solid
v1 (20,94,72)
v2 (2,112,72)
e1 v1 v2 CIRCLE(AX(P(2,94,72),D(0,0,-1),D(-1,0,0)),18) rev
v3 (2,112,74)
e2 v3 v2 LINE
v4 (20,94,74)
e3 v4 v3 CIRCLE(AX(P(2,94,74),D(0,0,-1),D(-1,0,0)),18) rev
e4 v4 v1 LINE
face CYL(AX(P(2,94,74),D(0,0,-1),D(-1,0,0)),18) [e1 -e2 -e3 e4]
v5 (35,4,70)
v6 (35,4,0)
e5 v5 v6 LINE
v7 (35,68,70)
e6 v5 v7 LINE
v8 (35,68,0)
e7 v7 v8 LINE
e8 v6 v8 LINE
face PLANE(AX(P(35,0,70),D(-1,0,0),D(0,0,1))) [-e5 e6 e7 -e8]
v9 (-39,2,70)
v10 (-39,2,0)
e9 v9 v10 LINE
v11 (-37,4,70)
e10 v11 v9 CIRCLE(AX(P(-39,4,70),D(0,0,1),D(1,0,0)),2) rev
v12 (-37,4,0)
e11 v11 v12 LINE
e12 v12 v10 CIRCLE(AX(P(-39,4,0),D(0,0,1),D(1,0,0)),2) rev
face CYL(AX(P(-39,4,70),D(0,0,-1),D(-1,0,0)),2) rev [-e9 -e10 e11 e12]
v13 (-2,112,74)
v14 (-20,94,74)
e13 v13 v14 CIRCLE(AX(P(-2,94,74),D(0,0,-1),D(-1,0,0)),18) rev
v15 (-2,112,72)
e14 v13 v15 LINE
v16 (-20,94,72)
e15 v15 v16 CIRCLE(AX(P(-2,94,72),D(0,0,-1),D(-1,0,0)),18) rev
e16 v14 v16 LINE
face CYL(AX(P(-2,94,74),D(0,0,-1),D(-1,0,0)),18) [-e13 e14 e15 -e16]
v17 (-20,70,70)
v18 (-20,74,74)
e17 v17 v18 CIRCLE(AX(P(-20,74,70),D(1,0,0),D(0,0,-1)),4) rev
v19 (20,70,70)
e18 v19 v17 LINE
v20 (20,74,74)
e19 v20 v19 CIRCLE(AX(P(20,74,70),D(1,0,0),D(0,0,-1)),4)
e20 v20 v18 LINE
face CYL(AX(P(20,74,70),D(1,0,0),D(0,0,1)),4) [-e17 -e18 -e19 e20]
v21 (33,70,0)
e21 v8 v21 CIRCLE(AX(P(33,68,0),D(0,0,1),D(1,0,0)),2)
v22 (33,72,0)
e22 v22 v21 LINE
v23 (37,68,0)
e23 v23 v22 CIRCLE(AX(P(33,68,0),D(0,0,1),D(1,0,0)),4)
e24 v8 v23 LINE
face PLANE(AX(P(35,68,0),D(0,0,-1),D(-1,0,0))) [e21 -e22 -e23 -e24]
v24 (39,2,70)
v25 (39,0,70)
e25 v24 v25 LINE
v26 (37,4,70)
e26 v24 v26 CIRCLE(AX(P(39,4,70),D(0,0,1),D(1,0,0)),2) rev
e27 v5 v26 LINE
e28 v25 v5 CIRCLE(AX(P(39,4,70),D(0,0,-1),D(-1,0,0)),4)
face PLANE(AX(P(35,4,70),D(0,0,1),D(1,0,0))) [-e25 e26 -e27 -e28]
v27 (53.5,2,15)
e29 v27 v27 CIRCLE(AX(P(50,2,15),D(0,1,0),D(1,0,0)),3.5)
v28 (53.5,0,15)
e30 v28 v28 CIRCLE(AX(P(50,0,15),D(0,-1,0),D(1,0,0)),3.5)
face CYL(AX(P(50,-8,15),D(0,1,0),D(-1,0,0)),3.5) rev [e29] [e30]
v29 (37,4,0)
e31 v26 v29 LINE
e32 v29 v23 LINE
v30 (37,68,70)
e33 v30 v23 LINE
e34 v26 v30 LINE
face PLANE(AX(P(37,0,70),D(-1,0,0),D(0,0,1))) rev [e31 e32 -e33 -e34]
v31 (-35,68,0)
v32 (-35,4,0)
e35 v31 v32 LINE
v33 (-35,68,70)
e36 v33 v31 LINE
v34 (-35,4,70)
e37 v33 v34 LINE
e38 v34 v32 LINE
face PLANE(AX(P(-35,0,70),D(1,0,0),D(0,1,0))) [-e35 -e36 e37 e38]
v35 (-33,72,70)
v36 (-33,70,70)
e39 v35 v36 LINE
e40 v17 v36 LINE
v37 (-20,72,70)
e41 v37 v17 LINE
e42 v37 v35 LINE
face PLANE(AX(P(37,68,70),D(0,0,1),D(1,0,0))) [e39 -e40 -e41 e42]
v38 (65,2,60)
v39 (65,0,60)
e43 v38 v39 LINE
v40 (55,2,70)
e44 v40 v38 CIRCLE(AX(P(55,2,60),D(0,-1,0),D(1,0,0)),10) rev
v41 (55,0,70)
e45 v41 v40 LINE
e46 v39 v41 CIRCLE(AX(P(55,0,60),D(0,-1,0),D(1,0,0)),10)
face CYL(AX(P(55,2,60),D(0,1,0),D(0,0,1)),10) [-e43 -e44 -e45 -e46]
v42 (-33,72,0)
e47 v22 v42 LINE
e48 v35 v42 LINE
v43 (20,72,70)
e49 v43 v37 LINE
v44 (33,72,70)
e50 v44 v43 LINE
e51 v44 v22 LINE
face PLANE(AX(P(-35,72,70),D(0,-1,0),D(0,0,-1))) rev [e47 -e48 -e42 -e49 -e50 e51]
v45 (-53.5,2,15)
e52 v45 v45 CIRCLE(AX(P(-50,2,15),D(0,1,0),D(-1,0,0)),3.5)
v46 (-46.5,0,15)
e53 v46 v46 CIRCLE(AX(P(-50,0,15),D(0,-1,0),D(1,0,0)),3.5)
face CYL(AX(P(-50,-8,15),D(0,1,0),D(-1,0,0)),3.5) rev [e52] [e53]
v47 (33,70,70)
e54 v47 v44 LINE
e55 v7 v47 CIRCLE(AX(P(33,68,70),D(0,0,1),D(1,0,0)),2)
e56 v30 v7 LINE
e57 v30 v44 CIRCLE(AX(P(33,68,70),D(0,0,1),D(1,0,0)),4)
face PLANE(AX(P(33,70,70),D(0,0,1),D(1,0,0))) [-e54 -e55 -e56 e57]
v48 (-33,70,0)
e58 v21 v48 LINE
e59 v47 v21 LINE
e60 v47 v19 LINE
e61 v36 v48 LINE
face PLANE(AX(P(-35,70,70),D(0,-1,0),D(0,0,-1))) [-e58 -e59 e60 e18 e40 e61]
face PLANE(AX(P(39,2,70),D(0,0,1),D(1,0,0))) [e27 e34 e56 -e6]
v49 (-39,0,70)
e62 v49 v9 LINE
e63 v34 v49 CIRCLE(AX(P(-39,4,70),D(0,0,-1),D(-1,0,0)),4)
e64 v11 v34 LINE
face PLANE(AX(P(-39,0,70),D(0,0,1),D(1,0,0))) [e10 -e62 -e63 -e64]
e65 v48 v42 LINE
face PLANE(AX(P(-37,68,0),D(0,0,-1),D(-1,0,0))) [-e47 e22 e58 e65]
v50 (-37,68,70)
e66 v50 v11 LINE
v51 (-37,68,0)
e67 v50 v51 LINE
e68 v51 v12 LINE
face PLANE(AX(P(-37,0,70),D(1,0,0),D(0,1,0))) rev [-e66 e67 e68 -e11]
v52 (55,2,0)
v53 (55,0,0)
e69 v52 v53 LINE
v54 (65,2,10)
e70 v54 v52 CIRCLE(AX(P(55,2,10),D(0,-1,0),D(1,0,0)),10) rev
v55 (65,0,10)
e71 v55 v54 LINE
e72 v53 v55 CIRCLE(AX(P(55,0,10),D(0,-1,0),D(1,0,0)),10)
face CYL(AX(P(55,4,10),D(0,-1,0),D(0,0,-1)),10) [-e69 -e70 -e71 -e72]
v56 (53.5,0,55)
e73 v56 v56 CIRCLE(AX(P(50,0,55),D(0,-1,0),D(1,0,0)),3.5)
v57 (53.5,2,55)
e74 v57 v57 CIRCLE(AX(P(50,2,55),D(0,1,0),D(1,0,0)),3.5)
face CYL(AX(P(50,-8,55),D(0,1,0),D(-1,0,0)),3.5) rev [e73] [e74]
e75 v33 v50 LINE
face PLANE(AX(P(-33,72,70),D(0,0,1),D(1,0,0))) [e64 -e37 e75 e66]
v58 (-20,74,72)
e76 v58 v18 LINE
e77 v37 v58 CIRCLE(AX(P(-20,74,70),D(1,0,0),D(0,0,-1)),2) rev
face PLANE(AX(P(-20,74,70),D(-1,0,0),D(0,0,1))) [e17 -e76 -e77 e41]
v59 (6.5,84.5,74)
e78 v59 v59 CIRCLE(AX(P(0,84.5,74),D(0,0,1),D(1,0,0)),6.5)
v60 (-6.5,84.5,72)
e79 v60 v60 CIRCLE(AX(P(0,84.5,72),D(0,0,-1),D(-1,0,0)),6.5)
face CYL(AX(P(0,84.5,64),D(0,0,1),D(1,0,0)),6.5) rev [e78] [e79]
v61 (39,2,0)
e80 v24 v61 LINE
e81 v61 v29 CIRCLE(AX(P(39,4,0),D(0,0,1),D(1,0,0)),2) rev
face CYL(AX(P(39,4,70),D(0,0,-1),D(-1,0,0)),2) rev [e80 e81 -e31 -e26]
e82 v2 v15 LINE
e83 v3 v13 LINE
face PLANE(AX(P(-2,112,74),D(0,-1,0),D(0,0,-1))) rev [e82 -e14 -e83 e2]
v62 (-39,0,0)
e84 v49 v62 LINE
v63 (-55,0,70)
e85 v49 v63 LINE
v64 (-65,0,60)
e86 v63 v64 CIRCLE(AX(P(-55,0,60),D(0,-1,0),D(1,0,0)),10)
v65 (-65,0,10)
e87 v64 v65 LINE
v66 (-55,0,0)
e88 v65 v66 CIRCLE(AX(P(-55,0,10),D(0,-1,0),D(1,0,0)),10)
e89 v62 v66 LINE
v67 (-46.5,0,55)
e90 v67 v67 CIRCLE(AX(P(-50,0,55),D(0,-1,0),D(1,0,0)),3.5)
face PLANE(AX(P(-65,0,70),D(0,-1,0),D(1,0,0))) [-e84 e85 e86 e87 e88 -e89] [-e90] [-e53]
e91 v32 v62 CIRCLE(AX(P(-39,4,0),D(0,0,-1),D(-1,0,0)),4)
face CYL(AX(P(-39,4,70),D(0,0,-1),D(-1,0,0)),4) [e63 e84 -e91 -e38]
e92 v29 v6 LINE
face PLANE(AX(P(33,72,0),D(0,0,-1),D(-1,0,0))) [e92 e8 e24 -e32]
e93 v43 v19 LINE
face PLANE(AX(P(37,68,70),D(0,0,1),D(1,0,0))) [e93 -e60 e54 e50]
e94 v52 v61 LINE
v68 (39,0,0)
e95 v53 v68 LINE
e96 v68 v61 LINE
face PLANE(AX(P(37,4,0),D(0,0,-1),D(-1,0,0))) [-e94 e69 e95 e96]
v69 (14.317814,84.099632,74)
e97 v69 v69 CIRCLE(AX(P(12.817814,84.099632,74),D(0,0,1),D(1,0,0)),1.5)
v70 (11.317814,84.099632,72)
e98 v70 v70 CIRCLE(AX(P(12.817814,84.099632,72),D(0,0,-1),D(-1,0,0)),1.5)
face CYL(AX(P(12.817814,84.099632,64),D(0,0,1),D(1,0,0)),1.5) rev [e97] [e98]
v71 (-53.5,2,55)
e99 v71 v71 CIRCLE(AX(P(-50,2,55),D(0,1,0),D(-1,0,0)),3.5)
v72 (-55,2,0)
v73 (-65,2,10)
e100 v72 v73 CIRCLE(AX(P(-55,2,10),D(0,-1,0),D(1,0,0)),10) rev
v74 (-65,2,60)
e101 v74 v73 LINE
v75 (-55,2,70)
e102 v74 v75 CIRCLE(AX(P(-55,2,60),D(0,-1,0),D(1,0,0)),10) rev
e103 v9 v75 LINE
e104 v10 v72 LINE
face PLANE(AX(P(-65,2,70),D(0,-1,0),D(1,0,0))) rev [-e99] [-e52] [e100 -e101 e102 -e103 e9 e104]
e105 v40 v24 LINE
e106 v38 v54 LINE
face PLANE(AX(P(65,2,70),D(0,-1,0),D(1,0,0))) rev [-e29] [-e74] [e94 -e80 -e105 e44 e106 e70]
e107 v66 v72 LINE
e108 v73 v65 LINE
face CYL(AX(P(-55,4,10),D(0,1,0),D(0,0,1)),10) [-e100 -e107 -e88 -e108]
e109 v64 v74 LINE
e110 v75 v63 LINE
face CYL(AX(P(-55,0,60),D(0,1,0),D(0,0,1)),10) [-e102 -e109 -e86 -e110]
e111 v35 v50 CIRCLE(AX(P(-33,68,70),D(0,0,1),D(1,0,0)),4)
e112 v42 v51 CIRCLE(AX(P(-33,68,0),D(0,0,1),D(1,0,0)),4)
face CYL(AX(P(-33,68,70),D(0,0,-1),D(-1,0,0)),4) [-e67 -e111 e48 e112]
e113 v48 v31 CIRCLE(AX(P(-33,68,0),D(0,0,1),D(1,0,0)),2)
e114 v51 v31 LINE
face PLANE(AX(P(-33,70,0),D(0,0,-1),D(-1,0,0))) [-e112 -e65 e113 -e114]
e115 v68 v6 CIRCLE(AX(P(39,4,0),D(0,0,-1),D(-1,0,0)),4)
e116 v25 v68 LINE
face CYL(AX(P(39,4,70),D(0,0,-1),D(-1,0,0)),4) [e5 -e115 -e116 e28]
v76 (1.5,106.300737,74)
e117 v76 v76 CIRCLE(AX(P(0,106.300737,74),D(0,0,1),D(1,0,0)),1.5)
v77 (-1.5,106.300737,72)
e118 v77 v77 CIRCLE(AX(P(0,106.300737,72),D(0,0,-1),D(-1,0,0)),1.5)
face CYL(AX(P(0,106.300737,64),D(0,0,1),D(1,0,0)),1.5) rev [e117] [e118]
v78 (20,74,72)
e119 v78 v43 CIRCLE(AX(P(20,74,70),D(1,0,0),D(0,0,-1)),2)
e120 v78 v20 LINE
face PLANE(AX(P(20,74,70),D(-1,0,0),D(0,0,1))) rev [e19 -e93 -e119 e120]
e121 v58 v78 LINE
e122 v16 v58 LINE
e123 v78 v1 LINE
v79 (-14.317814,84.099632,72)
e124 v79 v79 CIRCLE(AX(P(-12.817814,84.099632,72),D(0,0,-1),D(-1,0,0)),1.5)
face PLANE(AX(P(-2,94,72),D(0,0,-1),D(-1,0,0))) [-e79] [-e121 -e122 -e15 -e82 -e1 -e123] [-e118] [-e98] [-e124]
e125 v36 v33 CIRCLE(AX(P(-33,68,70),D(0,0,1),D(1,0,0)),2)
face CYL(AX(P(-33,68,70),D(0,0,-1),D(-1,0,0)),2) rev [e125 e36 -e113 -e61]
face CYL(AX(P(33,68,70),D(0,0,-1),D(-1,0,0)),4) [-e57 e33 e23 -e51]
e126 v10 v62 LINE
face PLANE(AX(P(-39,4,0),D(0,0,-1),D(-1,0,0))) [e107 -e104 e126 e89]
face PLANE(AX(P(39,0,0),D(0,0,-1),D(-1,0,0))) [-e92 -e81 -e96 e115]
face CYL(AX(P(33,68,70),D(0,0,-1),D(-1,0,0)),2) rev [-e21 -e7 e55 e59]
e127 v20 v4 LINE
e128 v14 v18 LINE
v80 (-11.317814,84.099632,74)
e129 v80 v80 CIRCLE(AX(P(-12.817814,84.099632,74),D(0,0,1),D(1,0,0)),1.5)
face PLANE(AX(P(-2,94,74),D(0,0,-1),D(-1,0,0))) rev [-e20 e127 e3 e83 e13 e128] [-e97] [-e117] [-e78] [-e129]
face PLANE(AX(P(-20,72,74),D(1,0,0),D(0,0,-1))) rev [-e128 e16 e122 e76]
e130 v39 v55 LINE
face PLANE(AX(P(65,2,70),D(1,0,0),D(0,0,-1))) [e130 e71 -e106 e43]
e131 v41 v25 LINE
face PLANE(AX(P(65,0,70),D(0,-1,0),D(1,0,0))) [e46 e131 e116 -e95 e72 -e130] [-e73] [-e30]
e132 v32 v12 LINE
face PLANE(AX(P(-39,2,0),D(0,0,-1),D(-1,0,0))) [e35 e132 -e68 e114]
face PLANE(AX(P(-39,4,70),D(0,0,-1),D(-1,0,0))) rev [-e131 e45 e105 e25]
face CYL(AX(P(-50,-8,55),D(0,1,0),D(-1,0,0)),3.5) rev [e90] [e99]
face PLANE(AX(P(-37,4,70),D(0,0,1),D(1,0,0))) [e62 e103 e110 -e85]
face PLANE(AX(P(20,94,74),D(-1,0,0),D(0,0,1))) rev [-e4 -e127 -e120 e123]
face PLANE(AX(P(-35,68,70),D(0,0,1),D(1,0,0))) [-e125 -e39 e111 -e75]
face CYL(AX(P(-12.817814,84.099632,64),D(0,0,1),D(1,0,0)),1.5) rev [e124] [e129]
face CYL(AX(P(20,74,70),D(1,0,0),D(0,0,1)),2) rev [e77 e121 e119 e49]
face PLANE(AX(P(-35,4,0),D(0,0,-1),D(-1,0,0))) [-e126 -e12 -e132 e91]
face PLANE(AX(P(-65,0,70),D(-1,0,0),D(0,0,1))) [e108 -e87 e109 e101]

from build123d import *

# Parameters (mm, degrees)
BASE_FLANGE1_DEPTH      = 70
FILLET1_R               = 10
SKETCH6_R               = 3.5
CUT_EXTRUDE1_DEPTH      = 10
EDGE_FLANGE2_DEPTH      = 40
EDGE_FLANGE2_START      = 2
EDGE_FLANGE2_FLAT_DEPTH = 2
SKETCH14_R              = 1.5
CUT_EXTRUDE2_DEPTH      = 10


# Sheet-metal steps are written as plain solids
with BuildPart() as part:
    # Sketch1 → Base-Flange1 (new body)
    with BuildSketch(Plane.XY):
        with BuildLine():
            Line((-65, 0), (-39, 0))
            ThreePointArc((-39, 0), (-36.171572875, 1.171572875), (-35, 4))
            Line((-35, 4), (-35, 68))
            ThreePointArc((-35, 68), (-34.414213562, 69.414213562), (-33, 70))
            Line((-33, 70), (33, 70))
            ThreePointArc((33, 70), (34.414213562, 69.414213562), (35, 68))
            Line((35, 68), (35, 4))
            ThreePointArc((35, 4), (36.171572875, 1.171572875), (39, 0))
            Line((39, 0), (65, 0))
            Line((65, 0), (65, 2))
            Line((65, 2), (39, 2))
            ThreePointArc((39, 2), (37.585786438, 2.585786438), (37, 4))
            Line((37, 4), (37, 68))
            ThreePointArc((37, 68), (35.828427125, 70.828427125), (33, 72))
            Line((33, 72), (-33, 72))
            ThreePointArc((-33, 72), (-35.828427125, 70.828427125), (-37, 68))
            Line((-37, 68), (-37, 4))
            ThreePointArc((-37, 4), (-37.585786438, 2.585786438), (-39, 2))
            Line((-39, 2), (-65, 2))
            Line((-65, 2), (-65, 0))
        make_face()
    extrude(amount=BASE_FLANGE1_DEPTH)

    # Fillet1
    fillet1_edges = [part.edges().sort_by_distance(p)[0] for p in [
        (65, 1, 0),
        (-65, 1, 0),
        (65, 1, 70),
        (-65, 1, 70),
    ]]
    fillet(fillet1_edges, radius=FILLET1_R)

    # Sketch6 → Cut-Extrude1 (cut)
    with BuildSketch(Plane(origin=(0, 2, 0), x_dir=(1, 0, 0), z_dir=(0, 1, 0))):
        with Locations(Location((-50, -15, 0), (0, 0, 180))):
            Circle(SKETCH6_R)
        with Locations(Location((-50, -55, 0), (0, 0, 180))):
            Circle(SKETCH6_R)
        with Locations((50, -55)):
            Circle(SKETCH6_R)
        with Locations((50, -15)):
            Circle(SKETCH6_R)
    extrude(amount=-CUT_EXTRUDE1_DEPTH, mode=Mode.SUBTRACT)

    # Edge-Flange2 bend section (across the edge) → Edge-Flange2 (add)
    with BuildSketch(Plane(origin=(-20, 72, 72), x_dir=(0, 0, -1), z_dir=(1, 0, 0))):
        with BuildLine():
            Line((-2, 2), (0, 2))
            ThreePointArc((0, 2), (0.585786438, 0.585786438), (2, 0))
            Line((2, 0), (2, -2))
            ThreePointArc((2, -2), (-0.828427125, -0.828427125), (-2, 2))
        make_face()
    extrude(amount=EDGE_FLANGE2_DEPTH)

    # Edge-Flange2 profile (on flange) → Edge-Flange2 flat (add)
    with BuildSketch(Plane(origin=(0, 72, 72), x_dir=(1, 0, 0), z_dir=(0, 0, 1)).offset(EDGE_FLANGE2_START)):
        with BuildLine():
            ThreePointArc((20, 22), (14.727922061, 34.727922061), (2, 40))
            Line((2, 40), (-2, 40))
            ThreePointArc((-2, 40), (-14.727922061, 34.727922061), (-20, 22))
            Line((-20, 22), (-20, 2))
            Line((-20, 2), (20, 2))
            Line((20, 2), (20, 22))
        make_face()
    extrude(amount=-EDGE_FLANGE2_FLAT_DEPTH)

    # Sketch14 → Cut-Extrude2 (cut)
    with BuildSketch(Plane.XY.offset(74)):
        with Locations((0, 106.30073689)):
            Circle(SKETCH14_R)
        with Locations((-12.817814143, 84.099631551)):
            Circle(SKETCH14_R)
        with Locations((12.817814144, 84.099631551)):
            Circle(SKETCH14_R)
        with BuildLine():
            ThreePointArc((0, 90.999999997), (-6.5, 84.499999998), (-1e-09, 77.999999997))
            ThreePointArc((-1e-09, 77.999999997), (6.5, 84.499999997), (0, 90.999999997))
        make_face()
    extrude(amount=-CUT_EXTRUDE2_DEPTH, mode=Mode.SUBTRACT)


solid = part.part
